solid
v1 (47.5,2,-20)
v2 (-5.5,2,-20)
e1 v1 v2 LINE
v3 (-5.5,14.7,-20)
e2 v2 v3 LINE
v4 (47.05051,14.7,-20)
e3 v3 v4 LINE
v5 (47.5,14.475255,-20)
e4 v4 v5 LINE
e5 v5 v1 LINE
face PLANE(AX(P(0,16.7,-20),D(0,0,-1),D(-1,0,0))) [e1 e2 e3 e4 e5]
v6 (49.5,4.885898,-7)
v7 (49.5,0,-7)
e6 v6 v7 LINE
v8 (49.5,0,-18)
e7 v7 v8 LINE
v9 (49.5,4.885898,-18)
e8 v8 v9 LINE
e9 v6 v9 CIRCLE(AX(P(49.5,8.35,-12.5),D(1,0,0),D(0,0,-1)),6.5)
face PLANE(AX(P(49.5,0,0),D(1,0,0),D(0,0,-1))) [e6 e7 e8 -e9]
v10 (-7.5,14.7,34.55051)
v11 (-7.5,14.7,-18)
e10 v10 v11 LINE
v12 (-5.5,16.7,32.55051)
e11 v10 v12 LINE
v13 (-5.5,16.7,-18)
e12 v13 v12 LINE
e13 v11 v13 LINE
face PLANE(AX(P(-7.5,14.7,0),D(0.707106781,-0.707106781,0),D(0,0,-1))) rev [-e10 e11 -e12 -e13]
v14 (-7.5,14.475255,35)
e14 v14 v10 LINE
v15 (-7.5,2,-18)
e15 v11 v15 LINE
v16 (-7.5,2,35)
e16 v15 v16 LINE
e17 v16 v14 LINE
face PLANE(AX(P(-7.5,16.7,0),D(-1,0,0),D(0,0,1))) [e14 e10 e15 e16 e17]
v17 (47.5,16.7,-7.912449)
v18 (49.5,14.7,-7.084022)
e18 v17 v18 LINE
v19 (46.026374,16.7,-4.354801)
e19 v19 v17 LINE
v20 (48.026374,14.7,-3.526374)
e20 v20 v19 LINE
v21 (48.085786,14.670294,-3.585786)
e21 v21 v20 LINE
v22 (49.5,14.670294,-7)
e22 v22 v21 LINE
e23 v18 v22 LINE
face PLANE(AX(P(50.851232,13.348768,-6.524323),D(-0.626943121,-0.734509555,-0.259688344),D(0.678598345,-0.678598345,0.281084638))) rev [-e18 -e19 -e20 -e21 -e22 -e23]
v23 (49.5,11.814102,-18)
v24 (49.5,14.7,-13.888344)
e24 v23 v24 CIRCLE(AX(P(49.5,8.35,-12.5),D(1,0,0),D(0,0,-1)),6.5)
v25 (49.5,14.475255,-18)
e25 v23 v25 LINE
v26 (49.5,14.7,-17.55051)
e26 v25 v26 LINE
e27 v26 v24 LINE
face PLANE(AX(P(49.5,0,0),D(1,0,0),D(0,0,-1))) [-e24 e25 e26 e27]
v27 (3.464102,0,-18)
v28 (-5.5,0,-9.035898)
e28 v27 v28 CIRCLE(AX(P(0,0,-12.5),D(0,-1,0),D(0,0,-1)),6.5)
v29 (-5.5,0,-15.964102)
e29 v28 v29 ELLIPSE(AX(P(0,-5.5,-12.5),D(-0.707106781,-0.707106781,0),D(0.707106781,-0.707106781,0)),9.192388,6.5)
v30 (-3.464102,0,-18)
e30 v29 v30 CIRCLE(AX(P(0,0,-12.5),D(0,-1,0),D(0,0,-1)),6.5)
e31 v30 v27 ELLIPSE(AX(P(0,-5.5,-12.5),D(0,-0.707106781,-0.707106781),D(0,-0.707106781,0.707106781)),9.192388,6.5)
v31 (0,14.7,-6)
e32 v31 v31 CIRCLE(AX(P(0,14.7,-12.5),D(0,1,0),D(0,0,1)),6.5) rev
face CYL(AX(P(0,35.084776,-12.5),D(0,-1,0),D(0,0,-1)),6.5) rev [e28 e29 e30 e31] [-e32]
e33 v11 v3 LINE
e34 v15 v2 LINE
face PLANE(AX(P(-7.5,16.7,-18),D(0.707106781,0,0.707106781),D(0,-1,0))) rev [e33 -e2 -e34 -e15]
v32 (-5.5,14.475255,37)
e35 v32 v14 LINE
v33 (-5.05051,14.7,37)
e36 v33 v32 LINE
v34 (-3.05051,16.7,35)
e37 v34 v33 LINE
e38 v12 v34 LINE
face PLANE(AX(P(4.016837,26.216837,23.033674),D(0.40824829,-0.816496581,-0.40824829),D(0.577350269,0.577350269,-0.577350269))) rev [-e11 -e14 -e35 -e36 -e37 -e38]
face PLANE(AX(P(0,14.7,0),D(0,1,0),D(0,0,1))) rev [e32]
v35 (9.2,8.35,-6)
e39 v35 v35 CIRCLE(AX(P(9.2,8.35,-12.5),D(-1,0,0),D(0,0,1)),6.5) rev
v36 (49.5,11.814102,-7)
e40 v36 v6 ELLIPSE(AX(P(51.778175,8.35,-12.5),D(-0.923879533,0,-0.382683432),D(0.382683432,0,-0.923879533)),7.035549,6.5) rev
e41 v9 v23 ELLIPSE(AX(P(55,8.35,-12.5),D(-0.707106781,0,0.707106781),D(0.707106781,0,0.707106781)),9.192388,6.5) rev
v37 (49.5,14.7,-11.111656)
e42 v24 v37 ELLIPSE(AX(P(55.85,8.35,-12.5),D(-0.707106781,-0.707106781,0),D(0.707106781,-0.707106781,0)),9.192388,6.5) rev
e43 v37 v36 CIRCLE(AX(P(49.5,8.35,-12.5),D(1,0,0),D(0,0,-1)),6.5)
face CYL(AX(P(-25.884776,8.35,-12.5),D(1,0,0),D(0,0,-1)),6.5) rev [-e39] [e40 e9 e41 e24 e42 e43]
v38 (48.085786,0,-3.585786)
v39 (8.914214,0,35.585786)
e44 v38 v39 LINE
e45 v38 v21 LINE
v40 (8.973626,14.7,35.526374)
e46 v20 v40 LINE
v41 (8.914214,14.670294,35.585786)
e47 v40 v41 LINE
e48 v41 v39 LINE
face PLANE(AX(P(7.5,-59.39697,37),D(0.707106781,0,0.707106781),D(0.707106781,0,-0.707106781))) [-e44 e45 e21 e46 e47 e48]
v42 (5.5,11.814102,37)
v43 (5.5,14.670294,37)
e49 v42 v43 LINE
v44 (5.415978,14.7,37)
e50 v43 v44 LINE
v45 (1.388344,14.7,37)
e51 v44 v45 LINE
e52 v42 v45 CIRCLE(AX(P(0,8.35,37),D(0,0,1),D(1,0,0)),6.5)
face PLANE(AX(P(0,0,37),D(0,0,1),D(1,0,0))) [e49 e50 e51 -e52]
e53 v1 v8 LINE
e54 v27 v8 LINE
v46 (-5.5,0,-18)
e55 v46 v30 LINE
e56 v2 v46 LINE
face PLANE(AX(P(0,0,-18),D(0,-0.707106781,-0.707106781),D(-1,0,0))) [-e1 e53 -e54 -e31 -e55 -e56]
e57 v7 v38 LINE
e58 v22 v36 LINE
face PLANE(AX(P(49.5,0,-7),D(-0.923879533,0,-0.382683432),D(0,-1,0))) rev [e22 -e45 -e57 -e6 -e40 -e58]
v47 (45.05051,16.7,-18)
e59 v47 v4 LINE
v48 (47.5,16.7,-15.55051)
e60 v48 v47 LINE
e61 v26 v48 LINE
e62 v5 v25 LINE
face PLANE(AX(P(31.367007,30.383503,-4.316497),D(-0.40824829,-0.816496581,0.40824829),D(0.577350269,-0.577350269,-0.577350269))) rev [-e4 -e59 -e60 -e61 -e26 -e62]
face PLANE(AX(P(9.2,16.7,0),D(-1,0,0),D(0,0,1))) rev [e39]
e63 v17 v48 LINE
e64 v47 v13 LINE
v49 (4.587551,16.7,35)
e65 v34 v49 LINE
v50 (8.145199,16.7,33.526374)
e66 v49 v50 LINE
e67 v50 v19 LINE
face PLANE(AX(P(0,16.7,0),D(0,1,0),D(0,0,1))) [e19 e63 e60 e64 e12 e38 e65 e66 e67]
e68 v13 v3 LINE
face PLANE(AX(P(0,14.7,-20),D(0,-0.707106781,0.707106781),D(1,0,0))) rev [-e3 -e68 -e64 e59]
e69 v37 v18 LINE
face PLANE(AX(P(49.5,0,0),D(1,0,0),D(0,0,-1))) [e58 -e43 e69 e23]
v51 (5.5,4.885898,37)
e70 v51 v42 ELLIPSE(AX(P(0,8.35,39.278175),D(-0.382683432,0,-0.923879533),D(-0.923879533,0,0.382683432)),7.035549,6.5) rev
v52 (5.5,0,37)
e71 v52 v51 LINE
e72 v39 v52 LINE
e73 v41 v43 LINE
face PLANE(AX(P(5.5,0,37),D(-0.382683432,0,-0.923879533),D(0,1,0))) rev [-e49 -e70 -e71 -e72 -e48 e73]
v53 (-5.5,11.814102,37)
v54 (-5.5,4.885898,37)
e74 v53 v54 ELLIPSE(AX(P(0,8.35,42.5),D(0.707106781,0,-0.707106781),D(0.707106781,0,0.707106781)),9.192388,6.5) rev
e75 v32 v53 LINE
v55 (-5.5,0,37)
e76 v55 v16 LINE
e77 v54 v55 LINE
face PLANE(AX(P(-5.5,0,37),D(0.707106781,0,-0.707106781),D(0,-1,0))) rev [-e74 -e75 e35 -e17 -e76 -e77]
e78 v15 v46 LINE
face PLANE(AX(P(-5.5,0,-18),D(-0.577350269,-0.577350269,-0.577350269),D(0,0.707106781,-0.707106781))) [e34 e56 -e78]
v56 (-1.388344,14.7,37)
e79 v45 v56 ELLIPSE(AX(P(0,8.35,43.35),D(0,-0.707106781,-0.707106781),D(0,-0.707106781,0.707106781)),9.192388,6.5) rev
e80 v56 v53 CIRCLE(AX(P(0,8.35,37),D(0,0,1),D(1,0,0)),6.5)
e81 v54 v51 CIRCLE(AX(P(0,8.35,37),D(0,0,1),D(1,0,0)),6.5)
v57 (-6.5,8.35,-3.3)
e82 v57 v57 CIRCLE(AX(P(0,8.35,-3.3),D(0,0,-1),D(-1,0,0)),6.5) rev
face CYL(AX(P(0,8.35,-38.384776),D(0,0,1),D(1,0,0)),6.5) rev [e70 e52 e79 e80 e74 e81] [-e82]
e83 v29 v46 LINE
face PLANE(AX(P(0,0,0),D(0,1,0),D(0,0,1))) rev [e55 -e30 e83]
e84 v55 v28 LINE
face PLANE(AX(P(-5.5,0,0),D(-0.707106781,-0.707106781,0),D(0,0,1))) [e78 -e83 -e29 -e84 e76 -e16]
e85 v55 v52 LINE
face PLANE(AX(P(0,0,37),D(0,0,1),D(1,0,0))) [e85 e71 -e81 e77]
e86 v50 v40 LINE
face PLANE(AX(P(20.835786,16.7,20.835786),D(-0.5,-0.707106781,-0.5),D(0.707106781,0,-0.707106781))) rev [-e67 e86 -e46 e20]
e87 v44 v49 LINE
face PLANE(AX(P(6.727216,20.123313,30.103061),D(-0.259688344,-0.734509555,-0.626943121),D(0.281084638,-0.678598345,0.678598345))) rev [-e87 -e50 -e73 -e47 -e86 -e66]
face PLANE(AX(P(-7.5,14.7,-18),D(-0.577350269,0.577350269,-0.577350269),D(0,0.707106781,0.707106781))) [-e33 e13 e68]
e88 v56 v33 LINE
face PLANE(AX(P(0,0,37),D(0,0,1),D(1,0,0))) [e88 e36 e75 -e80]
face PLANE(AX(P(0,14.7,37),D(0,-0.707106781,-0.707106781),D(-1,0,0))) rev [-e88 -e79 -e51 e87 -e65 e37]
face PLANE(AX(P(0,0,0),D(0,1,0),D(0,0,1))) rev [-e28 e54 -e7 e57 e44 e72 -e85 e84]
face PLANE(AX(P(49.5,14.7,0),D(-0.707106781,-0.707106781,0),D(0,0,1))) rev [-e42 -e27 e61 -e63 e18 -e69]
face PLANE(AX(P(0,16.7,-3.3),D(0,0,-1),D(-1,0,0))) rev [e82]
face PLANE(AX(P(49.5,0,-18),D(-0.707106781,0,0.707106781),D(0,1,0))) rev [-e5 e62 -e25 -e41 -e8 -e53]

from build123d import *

# Parameters (mm, degrees)
SKETCH1_W           = 15
SKETCH1_H           = 10
SKETCH1_H_2         = 15
SKETCH1_W_2         = 10
BOSS_EXTRUDE1_DEPTH = 16.7
SKETCH2_R           = 6.5
CUT_EXTRUDE1_DEPTH  = 8.3
SKETCH3_R           = 6.5
CUT_EXTRUDE2_DEPTH  = 8.3
SKETCH4_R           = 6.5
CUT_EXTRUDE3_DEPTH  = 14.7
BOSS_EXTRUDE2_START = 32
SKETCH5_R           = 6.5
BOSS_EXTRUDE2_DEPTH = 32
BOSS_EXTRUDE3_START = 32
SKETCH6_R           = 6.5
BOSS_EXTRUDE3_DEPTH = 32
BOSS_EXTRUDE4_DEPTH = 16.7
CHAMFER1_SIZE       = 2
CHAMFER2_SIZE       = 2


with BuildPart() as part:
    # Sketch1 → Boss-Extrude1 (new body)
    with BuildSketch(Plane(origin=(0, 0, 0), x_dir=(1, 0, 0), z_dir=(0, 1, 0))):
        Rectangle(SKETCH1_W, SKETCH1_H)
        with Locations((0, 12.5)):
            Rectangle(SKETCH1_W, SKETCH1_H_2)
        with Locations((12.5, 12.5)):
            Rectangle(SKETCH1_W_2, SKETCH1_H_2)
    extrude(amount=BOSS_EXTRUDE1_DEPTH)

    # Sketch2 → Cut-Extrude1 (cut)
    with BuildSketch(Plane.XY.offset(5)):
        with Locations((0, 8.35)):
            Circle(SKETCH2_R)
    extrude(amount=-CUT_EXTRUDE1_DEPTH, mode=Mode.SUBTRACT)

    # Sketch3 → Cut-Extrude2 (cut)
    with BuildSketch(Plane(origin=(17.5, 0, 0), x_dir=(0, 0, -1), z_dir=(1, 0, 0))):
        with Locations((12.5, 8.35)):
            Circle(SKETCH3_R)
    extrude(amount=-CUT_EXTRUDE2_DEPTH, mode=Mode.SUBTRACT)

    # Sketch4 → Cut-Extrude3 (cut)
    with BuildSketch(Plane.XZ):
        with Locations(Location((0, -12.5, 0), (0, 0, 270))):
            Circle(SKETCH4_R)
    extrude(amount=-CUT_EXTRUDE3_DEPTH, mode=Mode.SUBTRACT)

    # Fillet8
    # the kernel refuses this chamfer: 2 mm, written as the material it adds along each edge
    with BuildSketch(Plane(origin=(7.5, 0, -5), x_dir=(-0.027495876610586494, 0, 0.9996219169112968), z_dir=(0, 1, 0))) as fillet8_piece_1:
        with BuildLine():
            Line((2.05734639, 0), (-0.11309431, 2.054235587))
            Line((-0.11309431, 2.054235587), (-0.153079186, 2.053135752))
            ThreePointArc((-0.153079186, 2.053135752), (-0.068258454, 1.026795659), (-0.039984877, -0.001099835))
            Line((-0.039984877, -0.001099835), (0.001099835, -0.039984877))
            ThreePointArc((0.001099835, -0.039984877), (1.028995329, -0.011711299), (2.058446225, -0.039984877))
            Line((2.058446225, -0.039984877), (2.05734639, 0))
        make_face()
    extrude(amount=16.7)
    # the kernel refuses this chamfer: 2 mm, written as the material it takes off along each edge
    with BuildSketch(Plane(origin=(-6.166666667, 1.333333333, -18.666666667), x_dir=(0.7071067811865471, 0, -0.707106781186548), z_dir=(-0.5773502691896263, -0.5773502691896255, -0.5773502691896254)), Plane(origin=(-6.166666667, 15.366666667, -18.666666667), x_dir=(0.7071067811865471, 0.7071067811865478, 0), z_dir=(-0.5773502691896261, 0.5773502691896256, -0.5773502691896256))) as fillet8_2_piece_1:
        Polygon((-1.414213562, -0.816496581), (1.414213562, -0.816496581), (0, 1.632993162), align=None)
    extrude(amount=2.540341184, mode=Mode.SUBTRACT)
    with BuildSketch(Plane(origin=(-7.5, 0, -25.143365976), x_dir=(-0.027495876610586494, 0.9996219169112968, 0), z_dir=(0, 0, 1)), Plane(origin=(22.643365976, 16.7, -20), x_dir=(0, 0.027495876610585647, 0.9996219169112968), z_dir=(-1, 0, 0)), Plane(origin=(-7.5, 16.7, 10.143365976), x_dir=(-0.027495876610586487, -0.9996219169112968, 0), z_dir=(0, 0, -1)), Plane(origin=(22.643365976, 0, -20), x_dir=(0, 0.9996219169112968, -0.02749587661058563), z_dir=(-1, 0, 0))) as fillet8_2_piece_2:
        with BuildLine():
            Line((2.05734639, 0), (-0.11309431, -2.054235587))
            Line((-0.11309431, -2.054235587), (-0.153079186, -2.053135752))
            ThreePointArc((-0.153079186, -2.053135752), (-0.068258454, -1.026795659), (-0.039984877, 0.001099835))
            Line((-0.039984877, 0.001099835), (0.001099835, 0.039984877))
            ThreePointArc((0.001099835, 0.039984877), (1.028995329, 0.011711299), (2.058446225, 0.039984877))
            Line((2.058446225, 0.039984877), (2.05734639, 0))
        make_face()
    extrude(amount=35.286731952, mode=Mode.SUBTRACT)
    with BuildSketch(Plane(origin=(-7.5, -5.143365976, -20), x_dir=(-0.02749587661058694, 0, 0.9996219169112968), z_dir=(0, 1, 0))) as fillet8_2_piece_3:
        with BuildLine():
            Line((2.05734639, 0), (-0.11309431, 2.054235587))
            Line((-0.11309431, 2.054235587), (-0.153079186, 2.053135752))
            ThreePointArc((-0.153079186, 2.053135752), (-0.068258454, 1.026795659), (-0.039984877, -0.001099835))
            Line((-0.039984877, -0.001099835), (0.001099835, -0.039984877))
            ThreePointArc((0.001099835, -0.039984877), (1.028995329, -0.011711299), (2.058446225, -0.039984877))
            Line((2.058446225, -0.039984877), (2.05734639, 0))
        make_face()
    extrude(amount=26.986731952, mode=Mode.SUBTRACT)

    # Sketch5 → Boss-Extrude2 (add)
    with BuildSketch(Plane.XY.offset(5).offset(BOSS_EXTRUDE2_START)):
        Polygon((-7.5, 14.7), (-7.5, 2), (-5.5, 0), (5.5, 0), (7.5, 0), (7.5, 16.7), (5.5, 16.7), (-5.5, 16.7), align=None)
        with Locations((0, 8.35)):
            Circle(SKETCH5_R, mode=Mode.SUBTRACT)
    extrude(amount=-BOSS_EXTRUDE2_DEPTH)

    # Sketch6 → Boss-Extrude3 (add)
    with BuildSketch(Plane(origin=(17.5, 0, 0), x_dir=(0, 0, -1), z_dir=(1, 0, 0)).offset(BOSS_EXTRUDE3_START)):
        Polygon((7, 0), (18, 0), (20, 2), (20, 14.7), (18, 16.7), (7, 16.7), (5, 16.7), (5, 0), align=None)
        with Locations((12.5, 8.35)):
            Circle(SKETCH6_R, mode=Mode.SUBTRACT)
    extrude(amount=-BOSS_EXTRUDE3_DEPTH)

    # Sketch7 → Boss-Extrude4 (add)
    with BuildSketch(Plane(origin=(0, 16.7, 0), x_dir=(1, 0, 0), z_dir=(0, 1, 0))):
        Polygon((7.5, -37), (7.5, 3), (9.5, 5), (49.5, 5), align=None)
    extrude(amount=-BOSS_EXTRUDE4_DEPTH)

    # Chamfer1
    # the kernel refuses this chamfer: 2 mm, written as the material it takes off along each edge
    with BuildSketch(Plane(origin=(49.5, 16.7, 0.143365976), x_dir=(-0.9996219169112968, 0.027495876610585647, 0), z_dir=(0, 0, -1)), Plane(origin=(-10.643365976, 16.7, 37), x_dir=(0, 0.027495876610585647, -0.9996219169112968), z_dir=(1, 0, 0))) as chamfer1_piece_1:
        Polygon((CHAMFER1_SIZE * 0.999621916911, -CHAMFER1_SIZE * 0.0274958766106), (-CHAMFER1_SIZE * 0.0274958766106, -CHAMFER1_SIZE * 0.999621916911), (0, 0), align=None)
    extrude(amount=23.286731952, mode=Mode.SUBTRACT)
    with BuildSketch(Plane(origin=(53.13690896, 16.7, -8.63690896), x_dir=(-0.7068394360706737, 0.027495876610585664, -0.7068394360706735), z_dir=(-0.7071067811865475, 0, 0.7071067811865476))) as chamfer1_piece_2:
        Polygon((CHAMFER1_SIZE * 0.999621916911, CHAMFER1_SIZE * 0.0274958766106), (-CHAMFER1_SIZE * 0.0274958766106, CHAMFER1_SIZE * 0.999621916911), (0, 0), align=None)
    extrude(amount=69.683701572, mode=Mode.SUBTRACT)

    # Chamfer2
    # the kernel refuses this chamfer: 2 mm, written as the material it takes off along each edge
    with BuildSketch(Plane(origin=(53.023839401, 11.176160599, -3.540377928), x_dir=(-0.5328158002121677, -0.1913765872198606, 0.8243071787315372), z_dir=(-0.6785983445455896, 0.6785983445461322, -0.2810846377147535))) as chamfer2_piece_1:
        Polygon((CHAMFER2_SIZE * 0.999945689414, -CHAMFER2_SIZE * 0.0104220066763), (-CHAMFER2_SIZE * 0.858936955191, -CHAMFER2_SIZE * 0.512081348037), (0, 0), align=None)
    extrude(amount=13.332892535, mode=Mode.SUBTRACT)
    with BuildSketch(Plane(origin=(44.512690686, 19.687309314, -15.012690686), x_dir=(0.4218381251250203, -0.39450595107904946, 0.816344076204527), z_dir=(0.5773502691895054, -0.5773502691899669, -0.577350269189405)), Plane(origin=(-10.487309314, 11.712690686, 39.987309314), x_dir=(0.8163440762039974, -0.3945059510795843, 0.4218381251255447), z_dir=(0.5773502691901542, 0.5773502691895923, -0.5773502691891308))) as chamfer2_piece_2:
        Polygon((CHAMFER2_SIZE * 0.999813220622, CHAMFER2_SIZE * 0.0193267656127), (-CHAMFER2_SIZE * 0.516644080304, CHAMFER2_SIZE * 0.856200265292), (0, 0), align=None)
    extrude(amount=13.812444634, mode=Mode.SUBTRACT)
    with BuildSketch(Plane(origin=(7.5, -5.185340786, 37), x_dir=(-0.9998910622590239, 0, 0.014760203742522883), z_dir=(0, 1, 0))) as chamfer2_piece_3:
        Polygon((CHAMFER2_SIZE * 0.999891062259, -CHAMFER2_SIZE * 0.0147602037425), (-CHAMFER2_SIZE * 0.717466790729, -CHAMFER2_SIZE * 0.696592710413), (0, 0), align=None)
    extrude(amount=25.070681572, mode=Mode.SUBTRACT)
    with BuildSketch(Plane(origin=(5.211950804, 20.223839401, 31.476160599), x_dir=(-0.959630861315162, -0.1913765872199142, 0.20611553040850397), z_dir=(0.2810846377147535, -0.6785983445461322, 0.6785983445455896))) as chamfer2_piece_4:
        Polygon((CHAMFER2_SIZE * 0.999945689414, CHAMFER2_SIZE * 0.0104220066763), (-CHAMFER2_SIZE * 0.858936955191, CHAMFER2_SIZE * 0.512081348037), (0, 0), align=None)
    extrude(amount=13.332892535, mode=Mode.SUBTRACT)
    with BuildSketch(Plane(origin=(49.5, -3.143365976, -20), x_dir=(0.027495876610585647, 0, 0.9996219169112968), z_dir=(0, 1, 0)), Plane(origin=(-7.5, 19.843365976, 37), x_dir=(0.9996219169112968, 0, 0.027495876610585623), z_dir=(0, -1, 0))) as chamfer2_piece_5:
        Polygon((CHAMFER2_SIZE * 0.999621916911, -CHAMFER2_SIZE * 0.0274958766106), (-CHAMFER2_SIZE * 0.0274958766106, -CHAMFER2_SIZE * 0.999621916911), (0, 0), align=None)
    extrude(amount=22.986731952, mode=Mode.SUBTRACT)
    with BuildSketch(Plane(origin=(49.5, 19.885340786, -5), x_dir=(-0.6965927104131439, 0, 0.7174667907292085), z_dir=(0, -1, 0))) as chamfer2_piece_6:
        Polygon((CHAMFER2_SIZE * 0.999891062259, CHAMFER2_SIZE * 0.0147602037425), (-CHAMFER2_SIZE * 0.717466790729, CHAMFER2_SIZE * 0.696592710413), (0, 0), align=None)
    extrude(amount=25.070681572, mode=Mode.SUBTRACT)


solid = part.part
